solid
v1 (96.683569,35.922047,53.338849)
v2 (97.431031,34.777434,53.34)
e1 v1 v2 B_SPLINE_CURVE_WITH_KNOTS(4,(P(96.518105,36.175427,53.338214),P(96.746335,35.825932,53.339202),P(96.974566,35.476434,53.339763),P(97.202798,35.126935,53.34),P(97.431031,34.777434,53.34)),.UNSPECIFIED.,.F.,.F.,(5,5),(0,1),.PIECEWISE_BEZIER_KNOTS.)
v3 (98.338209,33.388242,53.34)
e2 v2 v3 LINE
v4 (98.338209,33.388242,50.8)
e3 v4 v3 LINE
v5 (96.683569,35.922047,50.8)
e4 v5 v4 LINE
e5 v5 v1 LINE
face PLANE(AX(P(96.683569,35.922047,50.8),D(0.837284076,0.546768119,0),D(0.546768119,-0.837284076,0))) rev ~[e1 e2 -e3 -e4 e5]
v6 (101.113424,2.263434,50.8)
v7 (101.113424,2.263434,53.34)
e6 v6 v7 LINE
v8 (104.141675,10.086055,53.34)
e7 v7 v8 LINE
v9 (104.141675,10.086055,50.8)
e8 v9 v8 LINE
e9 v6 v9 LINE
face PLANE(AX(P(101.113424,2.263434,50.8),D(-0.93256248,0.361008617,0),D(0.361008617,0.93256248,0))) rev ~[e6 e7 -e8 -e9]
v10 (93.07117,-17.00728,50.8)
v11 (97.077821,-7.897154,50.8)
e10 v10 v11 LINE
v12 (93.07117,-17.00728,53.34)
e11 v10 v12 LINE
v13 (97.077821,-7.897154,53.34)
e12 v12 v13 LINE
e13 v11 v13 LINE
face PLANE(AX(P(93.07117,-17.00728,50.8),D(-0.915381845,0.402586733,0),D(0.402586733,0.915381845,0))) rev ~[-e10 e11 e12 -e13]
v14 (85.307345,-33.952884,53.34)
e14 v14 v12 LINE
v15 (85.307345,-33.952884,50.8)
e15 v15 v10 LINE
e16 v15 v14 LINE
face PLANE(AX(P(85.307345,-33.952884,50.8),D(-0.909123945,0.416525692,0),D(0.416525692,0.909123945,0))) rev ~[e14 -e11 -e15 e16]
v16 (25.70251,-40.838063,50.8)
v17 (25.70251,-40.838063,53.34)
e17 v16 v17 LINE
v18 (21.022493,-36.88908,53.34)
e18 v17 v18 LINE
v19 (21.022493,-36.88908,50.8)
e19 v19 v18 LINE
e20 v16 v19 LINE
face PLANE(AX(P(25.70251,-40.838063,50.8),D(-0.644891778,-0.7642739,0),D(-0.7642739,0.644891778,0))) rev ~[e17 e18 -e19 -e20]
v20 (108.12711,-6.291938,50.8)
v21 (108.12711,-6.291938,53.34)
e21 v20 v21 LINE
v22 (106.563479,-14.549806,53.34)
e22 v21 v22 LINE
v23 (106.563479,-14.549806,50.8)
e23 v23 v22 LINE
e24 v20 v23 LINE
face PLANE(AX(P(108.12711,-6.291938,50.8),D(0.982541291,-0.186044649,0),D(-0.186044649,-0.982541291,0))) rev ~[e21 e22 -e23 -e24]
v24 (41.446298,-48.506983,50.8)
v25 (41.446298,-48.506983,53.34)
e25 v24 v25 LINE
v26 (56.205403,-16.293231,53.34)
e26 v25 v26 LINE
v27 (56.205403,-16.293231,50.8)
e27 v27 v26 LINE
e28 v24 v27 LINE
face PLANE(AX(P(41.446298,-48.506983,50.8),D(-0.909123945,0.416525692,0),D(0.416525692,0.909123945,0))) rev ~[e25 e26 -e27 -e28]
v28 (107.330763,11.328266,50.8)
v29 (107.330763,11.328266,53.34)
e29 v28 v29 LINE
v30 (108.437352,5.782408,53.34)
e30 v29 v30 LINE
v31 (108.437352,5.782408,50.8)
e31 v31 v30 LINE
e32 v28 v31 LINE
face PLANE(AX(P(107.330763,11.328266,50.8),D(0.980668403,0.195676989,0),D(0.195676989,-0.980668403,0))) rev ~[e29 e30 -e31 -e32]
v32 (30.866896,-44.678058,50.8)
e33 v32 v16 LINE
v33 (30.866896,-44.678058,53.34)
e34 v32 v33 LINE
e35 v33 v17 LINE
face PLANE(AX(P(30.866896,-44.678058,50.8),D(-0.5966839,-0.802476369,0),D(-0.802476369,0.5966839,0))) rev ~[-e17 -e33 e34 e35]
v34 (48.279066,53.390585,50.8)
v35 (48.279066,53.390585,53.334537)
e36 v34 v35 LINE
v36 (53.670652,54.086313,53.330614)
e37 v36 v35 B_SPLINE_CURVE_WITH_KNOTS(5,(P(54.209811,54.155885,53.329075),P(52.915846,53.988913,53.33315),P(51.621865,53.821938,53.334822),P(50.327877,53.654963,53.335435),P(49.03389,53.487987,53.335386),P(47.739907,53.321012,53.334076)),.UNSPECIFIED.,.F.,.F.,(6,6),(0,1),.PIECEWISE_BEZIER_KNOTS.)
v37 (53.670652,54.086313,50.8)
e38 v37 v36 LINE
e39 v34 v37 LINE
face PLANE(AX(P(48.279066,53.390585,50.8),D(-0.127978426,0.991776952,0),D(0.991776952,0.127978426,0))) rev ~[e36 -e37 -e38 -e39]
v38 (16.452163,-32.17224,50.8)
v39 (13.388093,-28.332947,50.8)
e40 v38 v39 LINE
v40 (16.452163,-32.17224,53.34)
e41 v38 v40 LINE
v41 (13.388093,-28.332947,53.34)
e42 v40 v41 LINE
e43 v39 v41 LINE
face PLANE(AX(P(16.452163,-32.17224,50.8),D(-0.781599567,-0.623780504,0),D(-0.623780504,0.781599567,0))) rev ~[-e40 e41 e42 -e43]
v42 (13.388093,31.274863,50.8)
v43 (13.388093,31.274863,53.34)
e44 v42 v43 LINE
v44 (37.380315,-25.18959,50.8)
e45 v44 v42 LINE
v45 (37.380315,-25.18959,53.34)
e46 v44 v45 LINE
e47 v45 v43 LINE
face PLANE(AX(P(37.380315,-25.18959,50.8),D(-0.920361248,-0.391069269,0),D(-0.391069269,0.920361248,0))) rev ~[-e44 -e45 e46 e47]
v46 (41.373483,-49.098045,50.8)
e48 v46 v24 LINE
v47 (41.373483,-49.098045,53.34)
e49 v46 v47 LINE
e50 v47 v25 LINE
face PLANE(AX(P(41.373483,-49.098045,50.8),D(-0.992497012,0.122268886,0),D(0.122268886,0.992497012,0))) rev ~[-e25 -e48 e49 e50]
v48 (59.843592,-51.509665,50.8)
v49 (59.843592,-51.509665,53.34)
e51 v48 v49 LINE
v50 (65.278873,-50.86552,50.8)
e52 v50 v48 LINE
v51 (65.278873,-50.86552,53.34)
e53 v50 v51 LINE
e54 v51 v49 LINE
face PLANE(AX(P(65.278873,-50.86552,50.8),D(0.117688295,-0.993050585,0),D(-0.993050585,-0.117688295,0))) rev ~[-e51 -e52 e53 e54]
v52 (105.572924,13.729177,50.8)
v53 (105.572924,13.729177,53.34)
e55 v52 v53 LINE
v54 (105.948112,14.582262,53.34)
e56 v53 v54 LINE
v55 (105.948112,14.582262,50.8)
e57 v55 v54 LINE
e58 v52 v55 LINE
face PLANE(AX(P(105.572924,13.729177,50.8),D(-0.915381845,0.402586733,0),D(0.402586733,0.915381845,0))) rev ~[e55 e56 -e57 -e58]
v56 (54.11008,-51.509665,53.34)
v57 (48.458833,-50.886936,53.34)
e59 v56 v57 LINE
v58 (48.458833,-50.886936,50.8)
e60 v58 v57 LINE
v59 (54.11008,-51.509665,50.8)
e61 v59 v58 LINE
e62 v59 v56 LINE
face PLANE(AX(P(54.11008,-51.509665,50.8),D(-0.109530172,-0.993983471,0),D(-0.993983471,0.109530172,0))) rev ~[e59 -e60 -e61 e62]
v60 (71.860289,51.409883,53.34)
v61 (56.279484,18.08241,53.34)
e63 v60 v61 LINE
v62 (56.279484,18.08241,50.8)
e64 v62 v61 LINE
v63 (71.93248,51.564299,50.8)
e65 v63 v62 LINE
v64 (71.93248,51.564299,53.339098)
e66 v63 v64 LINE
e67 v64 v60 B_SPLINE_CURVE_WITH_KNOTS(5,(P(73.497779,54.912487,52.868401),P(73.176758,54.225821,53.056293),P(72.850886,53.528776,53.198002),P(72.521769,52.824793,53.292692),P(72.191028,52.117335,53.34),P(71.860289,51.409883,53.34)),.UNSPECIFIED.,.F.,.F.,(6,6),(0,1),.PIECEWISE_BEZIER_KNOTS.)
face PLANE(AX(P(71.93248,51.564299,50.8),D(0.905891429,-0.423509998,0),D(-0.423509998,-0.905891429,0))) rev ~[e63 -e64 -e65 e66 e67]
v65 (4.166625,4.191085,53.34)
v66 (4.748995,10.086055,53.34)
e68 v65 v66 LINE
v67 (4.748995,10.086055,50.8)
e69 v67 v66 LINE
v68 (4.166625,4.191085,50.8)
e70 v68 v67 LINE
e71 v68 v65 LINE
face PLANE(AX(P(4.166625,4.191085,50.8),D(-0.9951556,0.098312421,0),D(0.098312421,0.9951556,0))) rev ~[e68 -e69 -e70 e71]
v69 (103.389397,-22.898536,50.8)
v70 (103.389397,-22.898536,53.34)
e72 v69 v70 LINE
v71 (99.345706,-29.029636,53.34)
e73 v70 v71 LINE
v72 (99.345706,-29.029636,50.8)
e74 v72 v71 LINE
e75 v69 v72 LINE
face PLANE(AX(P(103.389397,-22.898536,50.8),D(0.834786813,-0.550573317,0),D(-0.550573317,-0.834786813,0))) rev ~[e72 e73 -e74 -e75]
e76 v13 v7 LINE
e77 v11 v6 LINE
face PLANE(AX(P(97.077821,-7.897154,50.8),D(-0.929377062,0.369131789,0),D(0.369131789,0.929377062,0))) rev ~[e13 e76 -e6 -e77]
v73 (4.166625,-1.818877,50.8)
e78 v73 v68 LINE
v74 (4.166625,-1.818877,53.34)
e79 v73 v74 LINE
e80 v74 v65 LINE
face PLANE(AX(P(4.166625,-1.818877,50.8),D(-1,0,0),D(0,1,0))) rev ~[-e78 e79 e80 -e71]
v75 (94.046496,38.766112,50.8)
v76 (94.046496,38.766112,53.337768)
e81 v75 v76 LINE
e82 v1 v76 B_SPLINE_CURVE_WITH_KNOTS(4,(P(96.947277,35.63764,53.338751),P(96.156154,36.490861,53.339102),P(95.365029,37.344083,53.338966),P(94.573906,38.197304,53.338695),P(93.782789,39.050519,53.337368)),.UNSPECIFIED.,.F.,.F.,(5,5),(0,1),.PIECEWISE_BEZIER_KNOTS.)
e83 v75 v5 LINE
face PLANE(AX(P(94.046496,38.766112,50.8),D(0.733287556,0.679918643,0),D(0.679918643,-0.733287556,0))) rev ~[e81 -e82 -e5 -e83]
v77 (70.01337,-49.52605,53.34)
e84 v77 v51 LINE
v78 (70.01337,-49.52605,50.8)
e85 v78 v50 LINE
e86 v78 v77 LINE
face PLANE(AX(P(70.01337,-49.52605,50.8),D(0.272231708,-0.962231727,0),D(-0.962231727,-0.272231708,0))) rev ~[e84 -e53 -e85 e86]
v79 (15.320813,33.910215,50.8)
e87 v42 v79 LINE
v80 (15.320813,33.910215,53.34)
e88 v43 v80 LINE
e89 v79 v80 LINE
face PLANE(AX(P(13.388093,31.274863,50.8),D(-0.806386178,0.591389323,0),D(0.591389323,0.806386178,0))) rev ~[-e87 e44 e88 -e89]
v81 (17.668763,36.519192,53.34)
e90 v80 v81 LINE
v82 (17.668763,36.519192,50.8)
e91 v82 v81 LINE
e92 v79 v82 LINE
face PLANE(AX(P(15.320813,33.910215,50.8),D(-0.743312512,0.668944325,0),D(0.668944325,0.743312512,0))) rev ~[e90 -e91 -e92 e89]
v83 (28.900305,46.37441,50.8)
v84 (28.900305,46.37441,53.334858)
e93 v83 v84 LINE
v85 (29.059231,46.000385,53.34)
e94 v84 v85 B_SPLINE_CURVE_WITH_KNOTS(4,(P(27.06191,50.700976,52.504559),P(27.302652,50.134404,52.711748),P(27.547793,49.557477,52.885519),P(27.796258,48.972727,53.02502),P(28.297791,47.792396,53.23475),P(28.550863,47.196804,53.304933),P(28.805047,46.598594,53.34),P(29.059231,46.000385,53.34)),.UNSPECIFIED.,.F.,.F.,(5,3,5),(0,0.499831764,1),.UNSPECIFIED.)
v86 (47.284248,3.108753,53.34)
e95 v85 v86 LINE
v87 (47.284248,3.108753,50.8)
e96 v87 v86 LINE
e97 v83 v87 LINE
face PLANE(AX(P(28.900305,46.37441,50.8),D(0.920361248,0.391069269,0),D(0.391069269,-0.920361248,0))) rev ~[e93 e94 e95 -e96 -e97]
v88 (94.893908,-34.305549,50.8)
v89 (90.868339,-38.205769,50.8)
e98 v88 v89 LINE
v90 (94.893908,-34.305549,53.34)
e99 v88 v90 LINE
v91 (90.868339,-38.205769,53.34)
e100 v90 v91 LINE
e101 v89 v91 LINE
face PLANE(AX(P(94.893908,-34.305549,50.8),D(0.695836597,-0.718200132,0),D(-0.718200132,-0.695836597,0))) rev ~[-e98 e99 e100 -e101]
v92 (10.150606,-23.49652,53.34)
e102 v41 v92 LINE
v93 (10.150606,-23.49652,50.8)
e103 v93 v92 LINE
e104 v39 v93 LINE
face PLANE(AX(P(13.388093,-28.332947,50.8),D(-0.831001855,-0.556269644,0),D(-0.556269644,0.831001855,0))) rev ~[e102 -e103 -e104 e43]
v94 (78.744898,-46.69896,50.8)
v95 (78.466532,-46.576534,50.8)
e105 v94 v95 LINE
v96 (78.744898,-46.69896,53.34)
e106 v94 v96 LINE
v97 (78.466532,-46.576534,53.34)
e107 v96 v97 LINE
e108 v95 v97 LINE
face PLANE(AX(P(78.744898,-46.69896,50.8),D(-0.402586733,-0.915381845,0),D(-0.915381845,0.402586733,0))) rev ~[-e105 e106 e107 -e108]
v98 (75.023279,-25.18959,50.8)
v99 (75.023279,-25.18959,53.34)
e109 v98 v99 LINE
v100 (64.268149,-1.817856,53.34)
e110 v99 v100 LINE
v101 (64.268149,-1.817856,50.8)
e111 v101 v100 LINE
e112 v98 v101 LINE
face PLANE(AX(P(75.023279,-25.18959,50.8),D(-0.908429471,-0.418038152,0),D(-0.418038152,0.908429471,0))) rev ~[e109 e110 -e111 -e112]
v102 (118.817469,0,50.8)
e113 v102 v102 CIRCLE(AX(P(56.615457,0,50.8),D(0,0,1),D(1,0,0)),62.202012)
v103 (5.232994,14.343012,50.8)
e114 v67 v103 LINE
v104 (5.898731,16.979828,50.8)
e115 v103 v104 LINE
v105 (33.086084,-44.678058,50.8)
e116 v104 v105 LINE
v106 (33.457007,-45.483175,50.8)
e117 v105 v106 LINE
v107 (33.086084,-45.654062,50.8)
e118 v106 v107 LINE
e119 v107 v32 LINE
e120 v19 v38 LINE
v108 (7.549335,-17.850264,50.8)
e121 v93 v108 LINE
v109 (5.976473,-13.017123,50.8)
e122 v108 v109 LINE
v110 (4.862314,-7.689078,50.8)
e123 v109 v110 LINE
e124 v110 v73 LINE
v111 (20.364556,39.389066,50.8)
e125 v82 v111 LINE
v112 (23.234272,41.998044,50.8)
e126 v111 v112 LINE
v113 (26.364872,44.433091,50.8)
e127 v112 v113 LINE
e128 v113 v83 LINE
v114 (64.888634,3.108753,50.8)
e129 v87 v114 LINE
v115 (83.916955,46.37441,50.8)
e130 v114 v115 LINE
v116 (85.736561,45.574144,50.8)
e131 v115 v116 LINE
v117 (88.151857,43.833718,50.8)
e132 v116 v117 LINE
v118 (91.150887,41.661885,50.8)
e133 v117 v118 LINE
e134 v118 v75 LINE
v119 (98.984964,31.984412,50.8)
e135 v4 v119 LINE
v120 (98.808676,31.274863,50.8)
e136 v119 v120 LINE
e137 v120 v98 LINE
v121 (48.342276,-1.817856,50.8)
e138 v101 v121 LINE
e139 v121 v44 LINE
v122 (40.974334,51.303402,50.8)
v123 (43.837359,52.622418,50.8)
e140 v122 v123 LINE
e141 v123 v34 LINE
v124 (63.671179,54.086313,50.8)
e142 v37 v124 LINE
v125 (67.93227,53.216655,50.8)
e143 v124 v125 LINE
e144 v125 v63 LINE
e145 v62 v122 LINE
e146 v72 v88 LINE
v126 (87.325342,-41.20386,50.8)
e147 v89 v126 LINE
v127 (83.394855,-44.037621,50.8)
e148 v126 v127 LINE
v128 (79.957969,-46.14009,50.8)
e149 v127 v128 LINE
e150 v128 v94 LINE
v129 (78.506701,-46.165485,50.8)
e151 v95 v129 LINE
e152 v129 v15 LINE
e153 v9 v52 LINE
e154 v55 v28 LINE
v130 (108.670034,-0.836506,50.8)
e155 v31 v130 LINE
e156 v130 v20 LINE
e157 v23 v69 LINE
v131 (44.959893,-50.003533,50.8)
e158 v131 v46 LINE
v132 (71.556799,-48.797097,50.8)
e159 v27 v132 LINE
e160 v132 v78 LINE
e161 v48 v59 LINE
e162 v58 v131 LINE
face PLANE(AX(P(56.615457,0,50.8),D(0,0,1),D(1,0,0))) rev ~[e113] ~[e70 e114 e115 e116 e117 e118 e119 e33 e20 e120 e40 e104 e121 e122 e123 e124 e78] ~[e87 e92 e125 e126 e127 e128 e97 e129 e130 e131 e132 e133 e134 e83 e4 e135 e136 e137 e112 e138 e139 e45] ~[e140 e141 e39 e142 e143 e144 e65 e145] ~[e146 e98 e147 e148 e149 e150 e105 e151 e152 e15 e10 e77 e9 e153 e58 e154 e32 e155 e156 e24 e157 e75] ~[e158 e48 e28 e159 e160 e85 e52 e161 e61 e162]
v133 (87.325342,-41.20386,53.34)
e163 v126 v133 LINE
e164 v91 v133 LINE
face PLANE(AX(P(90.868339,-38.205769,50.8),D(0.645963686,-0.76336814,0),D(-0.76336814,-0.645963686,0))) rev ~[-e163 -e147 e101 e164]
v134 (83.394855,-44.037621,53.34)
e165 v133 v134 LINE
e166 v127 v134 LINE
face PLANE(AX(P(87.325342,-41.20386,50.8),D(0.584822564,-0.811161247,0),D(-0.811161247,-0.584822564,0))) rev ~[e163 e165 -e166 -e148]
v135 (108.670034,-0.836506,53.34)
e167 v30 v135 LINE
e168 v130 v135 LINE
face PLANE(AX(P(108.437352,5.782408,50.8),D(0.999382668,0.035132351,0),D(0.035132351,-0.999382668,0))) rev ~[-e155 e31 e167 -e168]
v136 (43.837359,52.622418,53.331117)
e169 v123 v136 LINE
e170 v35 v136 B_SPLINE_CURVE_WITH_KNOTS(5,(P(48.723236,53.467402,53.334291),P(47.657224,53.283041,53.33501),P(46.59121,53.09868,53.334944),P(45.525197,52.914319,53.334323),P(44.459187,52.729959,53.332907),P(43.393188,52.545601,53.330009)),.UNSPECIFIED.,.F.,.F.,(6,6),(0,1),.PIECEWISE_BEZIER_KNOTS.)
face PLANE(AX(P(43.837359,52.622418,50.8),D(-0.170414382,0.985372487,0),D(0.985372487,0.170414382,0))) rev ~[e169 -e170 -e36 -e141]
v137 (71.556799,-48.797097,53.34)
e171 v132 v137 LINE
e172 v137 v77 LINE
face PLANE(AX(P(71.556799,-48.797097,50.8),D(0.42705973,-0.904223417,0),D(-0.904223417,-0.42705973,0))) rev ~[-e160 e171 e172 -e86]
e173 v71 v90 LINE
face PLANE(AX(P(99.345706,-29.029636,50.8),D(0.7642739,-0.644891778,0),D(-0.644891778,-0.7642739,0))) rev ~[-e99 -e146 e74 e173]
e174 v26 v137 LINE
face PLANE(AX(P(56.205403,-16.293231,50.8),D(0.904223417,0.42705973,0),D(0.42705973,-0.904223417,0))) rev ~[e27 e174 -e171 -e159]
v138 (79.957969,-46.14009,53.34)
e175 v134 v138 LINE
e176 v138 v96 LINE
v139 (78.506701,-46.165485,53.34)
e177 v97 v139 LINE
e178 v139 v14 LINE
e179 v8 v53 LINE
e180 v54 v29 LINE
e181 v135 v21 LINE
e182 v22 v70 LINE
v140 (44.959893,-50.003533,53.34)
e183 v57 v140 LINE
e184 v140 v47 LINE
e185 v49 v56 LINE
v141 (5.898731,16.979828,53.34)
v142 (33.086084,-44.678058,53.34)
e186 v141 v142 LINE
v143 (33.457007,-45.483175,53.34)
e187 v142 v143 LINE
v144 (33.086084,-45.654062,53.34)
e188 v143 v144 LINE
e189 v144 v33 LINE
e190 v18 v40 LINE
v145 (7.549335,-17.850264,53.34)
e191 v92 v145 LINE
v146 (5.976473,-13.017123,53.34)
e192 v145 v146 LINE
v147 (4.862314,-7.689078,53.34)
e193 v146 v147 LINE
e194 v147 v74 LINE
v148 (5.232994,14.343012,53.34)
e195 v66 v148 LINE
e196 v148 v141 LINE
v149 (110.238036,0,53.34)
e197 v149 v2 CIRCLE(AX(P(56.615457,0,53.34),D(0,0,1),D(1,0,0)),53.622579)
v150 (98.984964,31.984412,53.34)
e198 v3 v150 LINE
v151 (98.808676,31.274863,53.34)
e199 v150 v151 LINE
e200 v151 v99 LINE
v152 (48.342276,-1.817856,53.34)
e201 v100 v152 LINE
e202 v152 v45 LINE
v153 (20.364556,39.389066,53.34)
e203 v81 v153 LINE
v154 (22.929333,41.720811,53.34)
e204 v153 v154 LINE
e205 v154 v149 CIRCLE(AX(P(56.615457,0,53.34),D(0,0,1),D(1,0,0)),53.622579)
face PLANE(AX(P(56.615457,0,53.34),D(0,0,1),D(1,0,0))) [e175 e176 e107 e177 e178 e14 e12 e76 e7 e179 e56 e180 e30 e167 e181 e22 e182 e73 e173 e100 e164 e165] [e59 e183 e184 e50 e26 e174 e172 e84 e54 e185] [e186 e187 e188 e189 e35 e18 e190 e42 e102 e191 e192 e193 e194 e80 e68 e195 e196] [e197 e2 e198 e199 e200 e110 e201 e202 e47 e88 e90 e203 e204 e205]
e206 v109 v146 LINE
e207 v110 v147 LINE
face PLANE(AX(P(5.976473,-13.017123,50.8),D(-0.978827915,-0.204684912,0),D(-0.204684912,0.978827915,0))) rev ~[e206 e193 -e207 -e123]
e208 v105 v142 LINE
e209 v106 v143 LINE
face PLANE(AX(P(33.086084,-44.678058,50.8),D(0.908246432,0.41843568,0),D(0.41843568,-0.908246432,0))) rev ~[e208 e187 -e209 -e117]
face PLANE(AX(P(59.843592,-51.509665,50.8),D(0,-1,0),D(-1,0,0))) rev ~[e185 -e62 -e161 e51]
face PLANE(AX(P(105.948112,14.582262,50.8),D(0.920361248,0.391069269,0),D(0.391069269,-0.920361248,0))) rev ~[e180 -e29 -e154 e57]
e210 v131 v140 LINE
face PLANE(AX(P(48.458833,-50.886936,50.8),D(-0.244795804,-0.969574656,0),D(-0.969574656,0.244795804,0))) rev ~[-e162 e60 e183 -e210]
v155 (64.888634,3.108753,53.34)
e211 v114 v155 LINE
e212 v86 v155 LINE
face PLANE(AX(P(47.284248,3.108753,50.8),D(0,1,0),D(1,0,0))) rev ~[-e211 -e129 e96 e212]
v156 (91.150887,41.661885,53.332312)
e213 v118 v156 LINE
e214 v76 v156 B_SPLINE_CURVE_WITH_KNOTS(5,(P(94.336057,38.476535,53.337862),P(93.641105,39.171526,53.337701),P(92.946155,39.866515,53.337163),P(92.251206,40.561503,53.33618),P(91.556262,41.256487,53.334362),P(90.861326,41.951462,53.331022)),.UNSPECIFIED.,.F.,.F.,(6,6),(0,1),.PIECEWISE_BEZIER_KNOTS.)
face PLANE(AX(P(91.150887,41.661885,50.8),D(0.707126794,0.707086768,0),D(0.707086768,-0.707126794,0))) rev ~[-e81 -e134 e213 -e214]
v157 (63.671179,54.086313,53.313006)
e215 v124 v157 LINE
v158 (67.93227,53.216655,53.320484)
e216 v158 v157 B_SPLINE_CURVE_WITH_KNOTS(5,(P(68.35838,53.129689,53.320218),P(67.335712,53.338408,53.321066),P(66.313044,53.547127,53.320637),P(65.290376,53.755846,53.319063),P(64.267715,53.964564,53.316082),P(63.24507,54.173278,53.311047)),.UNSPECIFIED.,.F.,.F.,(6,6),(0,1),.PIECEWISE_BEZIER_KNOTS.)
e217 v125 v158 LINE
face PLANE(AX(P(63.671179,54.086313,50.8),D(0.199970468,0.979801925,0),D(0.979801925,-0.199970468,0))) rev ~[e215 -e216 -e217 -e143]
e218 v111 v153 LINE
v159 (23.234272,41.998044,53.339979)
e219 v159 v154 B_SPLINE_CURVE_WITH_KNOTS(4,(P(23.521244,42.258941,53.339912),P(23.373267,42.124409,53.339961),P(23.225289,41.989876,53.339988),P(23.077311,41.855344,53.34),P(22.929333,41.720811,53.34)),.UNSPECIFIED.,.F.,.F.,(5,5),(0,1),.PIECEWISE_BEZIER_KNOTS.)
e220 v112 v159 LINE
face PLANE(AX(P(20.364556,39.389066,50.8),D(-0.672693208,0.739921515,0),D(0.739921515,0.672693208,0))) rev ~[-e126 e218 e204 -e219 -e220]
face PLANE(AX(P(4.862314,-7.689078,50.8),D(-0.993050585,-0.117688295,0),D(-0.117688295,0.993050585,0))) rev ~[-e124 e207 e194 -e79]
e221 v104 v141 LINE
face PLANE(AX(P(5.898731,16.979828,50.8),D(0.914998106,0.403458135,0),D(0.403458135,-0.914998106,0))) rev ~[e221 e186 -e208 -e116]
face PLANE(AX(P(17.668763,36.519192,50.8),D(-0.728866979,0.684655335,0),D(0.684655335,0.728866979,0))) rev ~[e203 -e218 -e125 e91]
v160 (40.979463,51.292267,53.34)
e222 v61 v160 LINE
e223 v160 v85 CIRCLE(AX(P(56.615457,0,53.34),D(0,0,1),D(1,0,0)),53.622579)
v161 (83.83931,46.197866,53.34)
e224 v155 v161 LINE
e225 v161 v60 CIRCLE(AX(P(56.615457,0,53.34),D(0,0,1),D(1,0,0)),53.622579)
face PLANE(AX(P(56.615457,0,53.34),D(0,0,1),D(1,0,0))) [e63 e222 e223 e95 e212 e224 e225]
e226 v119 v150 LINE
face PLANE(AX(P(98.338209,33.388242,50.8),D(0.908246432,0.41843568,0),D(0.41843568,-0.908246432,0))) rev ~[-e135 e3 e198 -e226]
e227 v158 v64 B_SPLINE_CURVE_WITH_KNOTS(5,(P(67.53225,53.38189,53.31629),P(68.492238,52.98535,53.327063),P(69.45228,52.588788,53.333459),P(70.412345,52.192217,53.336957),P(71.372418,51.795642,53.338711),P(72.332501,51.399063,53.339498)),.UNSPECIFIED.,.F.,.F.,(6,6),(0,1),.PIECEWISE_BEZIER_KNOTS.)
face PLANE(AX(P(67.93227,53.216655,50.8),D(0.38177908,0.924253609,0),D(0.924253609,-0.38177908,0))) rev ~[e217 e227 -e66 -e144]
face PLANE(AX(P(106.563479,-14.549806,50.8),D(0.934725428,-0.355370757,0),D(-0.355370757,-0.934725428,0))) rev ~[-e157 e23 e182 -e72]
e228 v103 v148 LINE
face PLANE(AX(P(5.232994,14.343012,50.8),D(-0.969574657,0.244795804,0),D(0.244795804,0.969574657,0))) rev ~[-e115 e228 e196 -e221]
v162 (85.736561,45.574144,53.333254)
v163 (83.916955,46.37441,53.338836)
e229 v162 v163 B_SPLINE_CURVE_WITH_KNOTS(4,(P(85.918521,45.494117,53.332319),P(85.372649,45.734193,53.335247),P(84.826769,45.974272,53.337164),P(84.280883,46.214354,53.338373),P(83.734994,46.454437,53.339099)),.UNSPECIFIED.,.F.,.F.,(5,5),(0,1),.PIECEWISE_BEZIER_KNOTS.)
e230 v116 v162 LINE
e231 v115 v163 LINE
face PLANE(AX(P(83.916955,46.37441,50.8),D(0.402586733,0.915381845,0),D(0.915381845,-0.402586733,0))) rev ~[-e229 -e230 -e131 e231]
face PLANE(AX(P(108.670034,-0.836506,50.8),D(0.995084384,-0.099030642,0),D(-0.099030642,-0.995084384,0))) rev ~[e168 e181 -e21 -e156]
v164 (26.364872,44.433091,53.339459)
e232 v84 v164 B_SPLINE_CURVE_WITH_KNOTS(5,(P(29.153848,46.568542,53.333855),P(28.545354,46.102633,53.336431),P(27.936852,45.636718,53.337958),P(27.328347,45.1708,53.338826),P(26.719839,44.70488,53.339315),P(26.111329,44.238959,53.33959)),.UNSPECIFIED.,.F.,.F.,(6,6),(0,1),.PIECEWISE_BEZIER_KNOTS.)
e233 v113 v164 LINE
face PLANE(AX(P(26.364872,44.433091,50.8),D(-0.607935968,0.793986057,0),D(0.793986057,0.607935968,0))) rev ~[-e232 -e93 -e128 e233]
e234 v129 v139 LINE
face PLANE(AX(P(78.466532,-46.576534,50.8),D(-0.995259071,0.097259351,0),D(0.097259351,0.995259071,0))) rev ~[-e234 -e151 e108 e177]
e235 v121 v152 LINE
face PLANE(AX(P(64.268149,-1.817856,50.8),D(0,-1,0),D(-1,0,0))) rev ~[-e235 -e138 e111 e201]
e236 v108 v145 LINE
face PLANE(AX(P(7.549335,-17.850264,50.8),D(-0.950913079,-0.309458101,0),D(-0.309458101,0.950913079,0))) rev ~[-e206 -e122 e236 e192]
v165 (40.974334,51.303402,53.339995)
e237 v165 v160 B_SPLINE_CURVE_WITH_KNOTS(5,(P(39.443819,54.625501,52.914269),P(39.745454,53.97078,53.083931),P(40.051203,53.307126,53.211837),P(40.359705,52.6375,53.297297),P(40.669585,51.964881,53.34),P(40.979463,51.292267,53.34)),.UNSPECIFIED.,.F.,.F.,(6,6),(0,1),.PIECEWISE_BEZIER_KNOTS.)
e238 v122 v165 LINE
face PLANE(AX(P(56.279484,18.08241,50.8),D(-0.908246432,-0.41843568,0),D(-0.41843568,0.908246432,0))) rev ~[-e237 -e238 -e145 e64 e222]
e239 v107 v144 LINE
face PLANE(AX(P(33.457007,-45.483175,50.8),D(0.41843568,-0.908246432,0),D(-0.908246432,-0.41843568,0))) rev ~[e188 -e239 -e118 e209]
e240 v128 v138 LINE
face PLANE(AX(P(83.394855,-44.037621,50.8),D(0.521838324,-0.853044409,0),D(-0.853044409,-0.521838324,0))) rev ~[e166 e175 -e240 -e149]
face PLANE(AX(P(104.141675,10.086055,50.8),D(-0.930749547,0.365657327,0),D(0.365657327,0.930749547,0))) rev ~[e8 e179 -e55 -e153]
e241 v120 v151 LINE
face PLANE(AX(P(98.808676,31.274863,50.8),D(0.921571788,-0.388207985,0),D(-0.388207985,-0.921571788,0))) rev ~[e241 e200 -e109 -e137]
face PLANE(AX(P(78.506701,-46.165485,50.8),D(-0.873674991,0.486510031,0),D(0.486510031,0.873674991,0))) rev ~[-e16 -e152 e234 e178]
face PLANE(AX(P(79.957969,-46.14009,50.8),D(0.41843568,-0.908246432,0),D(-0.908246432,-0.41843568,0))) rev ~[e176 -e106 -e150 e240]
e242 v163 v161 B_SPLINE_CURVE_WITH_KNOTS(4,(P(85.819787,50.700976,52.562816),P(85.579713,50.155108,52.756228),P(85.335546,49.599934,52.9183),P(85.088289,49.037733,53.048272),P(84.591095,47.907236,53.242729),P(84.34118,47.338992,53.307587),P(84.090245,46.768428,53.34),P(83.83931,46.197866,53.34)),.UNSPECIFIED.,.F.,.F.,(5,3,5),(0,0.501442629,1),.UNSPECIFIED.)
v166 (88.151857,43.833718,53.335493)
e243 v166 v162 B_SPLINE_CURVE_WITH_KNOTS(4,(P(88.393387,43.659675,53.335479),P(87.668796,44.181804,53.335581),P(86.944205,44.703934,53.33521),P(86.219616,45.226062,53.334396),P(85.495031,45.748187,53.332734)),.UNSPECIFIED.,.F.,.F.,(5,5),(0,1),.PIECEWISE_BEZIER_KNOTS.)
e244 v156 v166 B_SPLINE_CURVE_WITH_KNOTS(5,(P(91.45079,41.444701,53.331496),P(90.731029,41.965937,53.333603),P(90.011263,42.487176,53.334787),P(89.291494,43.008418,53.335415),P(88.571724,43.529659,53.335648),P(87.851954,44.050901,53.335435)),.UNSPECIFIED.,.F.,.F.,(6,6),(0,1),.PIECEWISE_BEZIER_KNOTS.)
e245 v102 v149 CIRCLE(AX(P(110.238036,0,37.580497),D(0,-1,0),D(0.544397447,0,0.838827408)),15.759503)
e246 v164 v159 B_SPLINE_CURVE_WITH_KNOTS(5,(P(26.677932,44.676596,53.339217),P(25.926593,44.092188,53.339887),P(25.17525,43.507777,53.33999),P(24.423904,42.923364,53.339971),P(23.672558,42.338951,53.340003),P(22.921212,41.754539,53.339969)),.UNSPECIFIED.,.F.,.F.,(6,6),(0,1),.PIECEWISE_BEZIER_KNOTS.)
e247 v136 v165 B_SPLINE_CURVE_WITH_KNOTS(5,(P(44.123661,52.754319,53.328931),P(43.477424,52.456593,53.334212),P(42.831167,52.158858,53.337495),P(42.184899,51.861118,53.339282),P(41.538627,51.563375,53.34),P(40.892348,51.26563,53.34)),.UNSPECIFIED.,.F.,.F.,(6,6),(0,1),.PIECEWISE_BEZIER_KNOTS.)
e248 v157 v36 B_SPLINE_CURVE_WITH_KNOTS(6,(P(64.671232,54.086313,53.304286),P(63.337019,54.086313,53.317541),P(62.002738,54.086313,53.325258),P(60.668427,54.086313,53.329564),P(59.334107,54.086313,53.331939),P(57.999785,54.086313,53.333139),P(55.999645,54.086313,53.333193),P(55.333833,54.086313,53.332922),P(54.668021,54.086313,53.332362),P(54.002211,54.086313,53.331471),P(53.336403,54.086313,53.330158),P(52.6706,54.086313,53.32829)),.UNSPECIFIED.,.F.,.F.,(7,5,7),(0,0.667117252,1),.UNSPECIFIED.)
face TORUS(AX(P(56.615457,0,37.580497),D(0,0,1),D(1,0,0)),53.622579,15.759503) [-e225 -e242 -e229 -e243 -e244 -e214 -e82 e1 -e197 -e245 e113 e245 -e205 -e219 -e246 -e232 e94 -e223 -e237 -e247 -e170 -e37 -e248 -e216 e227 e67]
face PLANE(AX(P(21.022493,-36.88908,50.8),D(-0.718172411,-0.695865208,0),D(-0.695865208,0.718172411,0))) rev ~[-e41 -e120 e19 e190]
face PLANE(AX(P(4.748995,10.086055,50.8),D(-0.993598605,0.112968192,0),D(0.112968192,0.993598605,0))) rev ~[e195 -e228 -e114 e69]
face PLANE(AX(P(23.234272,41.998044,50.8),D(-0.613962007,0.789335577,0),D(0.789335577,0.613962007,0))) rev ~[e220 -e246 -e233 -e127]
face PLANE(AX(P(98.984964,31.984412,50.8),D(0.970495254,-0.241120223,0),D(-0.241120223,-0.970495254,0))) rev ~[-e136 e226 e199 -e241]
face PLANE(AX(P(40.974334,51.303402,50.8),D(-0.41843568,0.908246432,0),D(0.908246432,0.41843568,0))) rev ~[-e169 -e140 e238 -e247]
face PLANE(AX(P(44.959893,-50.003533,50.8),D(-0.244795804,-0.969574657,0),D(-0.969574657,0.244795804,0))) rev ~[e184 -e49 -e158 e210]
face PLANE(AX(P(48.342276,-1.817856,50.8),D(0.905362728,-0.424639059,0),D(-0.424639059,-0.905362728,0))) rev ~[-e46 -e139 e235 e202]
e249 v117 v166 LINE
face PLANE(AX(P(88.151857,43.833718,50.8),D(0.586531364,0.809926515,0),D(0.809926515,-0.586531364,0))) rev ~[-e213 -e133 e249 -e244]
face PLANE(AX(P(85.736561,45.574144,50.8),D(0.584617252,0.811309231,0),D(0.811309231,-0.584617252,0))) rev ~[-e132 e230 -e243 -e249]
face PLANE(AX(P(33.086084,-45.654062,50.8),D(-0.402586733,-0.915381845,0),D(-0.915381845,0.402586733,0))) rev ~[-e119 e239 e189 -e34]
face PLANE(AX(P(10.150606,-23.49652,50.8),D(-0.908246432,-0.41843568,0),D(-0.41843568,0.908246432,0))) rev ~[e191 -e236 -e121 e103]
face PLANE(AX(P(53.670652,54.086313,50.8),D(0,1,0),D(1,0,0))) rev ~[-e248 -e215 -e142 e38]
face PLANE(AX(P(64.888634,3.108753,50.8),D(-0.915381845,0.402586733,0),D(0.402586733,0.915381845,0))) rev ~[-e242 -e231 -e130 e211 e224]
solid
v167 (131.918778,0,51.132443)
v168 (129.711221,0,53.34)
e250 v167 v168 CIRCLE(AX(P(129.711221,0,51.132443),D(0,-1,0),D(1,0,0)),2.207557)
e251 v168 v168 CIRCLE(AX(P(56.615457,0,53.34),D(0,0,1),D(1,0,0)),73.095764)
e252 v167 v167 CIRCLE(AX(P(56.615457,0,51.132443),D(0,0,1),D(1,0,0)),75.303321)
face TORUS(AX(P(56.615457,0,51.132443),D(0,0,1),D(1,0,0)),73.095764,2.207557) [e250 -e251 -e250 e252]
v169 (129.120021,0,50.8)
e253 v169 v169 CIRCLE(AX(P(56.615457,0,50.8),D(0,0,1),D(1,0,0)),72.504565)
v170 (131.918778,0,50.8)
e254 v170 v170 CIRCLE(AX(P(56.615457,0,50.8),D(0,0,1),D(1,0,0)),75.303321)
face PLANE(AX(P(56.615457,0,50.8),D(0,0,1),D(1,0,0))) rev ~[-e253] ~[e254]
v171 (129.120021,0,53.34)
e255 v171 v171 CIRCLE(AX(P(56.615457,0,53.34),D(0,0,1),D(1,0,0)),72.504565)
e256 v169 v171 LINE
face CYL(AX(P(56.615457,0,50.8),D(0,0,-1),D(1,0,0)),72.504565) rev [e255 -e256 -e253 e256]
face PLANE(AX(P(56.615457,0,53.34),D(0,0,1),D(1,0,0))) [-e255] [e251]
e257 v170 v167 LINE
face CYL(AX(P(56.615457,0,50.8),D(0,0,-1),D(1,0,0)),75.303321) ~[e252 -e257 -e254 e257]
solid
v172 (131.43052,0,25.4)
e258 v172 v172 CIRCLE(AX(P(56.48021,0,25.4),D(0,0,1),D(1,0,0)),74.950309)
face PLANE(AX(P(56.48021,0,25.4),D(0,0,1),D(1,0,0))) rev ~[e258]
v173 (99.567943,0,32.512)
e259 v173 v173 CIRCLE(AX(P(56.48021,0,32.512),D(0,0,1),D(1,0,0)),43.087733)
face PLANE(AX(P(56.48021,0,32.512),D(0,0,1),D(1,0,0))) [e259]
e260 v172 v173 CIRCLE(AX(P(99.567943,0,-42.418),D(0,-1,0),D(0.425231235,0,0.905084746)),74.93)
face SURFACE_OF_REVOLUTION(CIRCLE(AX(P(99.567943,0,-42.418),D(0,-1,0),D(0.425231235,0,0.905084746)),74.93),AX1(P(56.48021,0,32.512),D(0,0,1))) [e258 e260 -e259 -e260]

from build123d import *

# Parameters (mm, degrees)
F1_R     = 74.9503094081
F2_DEPTH = 7.112
F5_R     = 75.3033209634
F5_R_2   = 72.5045645267
F6_DEPTH = 2.54
F5_R_3   = 62.2020124847
F7_R     = 2.2075568814


# Not quite as in the source:
# - a fillet or chamfer that OpenCascade refuses, or shapes differently, is made with other operations: its cross-section is extruded or revolved along the edge and cut away or added


with BuildPart() as f2:
    # F1 (on offset) → F2 (new body)
    with BuildSketch(Plane.XY.offset(25.4)):
        with Locations((56.4802102745, 0)):
            Circle(F1_R)
    extrude(amount=F2_DEPTH)

    # F3: fillet of radius 74.93 on 1 edges, made by hand

    # F3_s1 → F3_t2 (revolve, cut)
    with BuildSketch(Plane.XZ):
        with BuildLine():
            ThreePointArc((131.4305196826, 25.4), (115.8912725817, 30.7123891689), (99.5679432645, 32.512))
            Line((99.5679432645, 32.512), (131.4305196826, 32.512))
            Line((131.4305196826, 32.512), (131.4305196826, 25.4))
        make_face()
    revolve(axis=Axis((56.4802102745, 0, 32.512), (0, 0, 1)), mode=Mode.SUBTRACT)


with BuildPart() as f6:
    # F5 (on offset) → F6 (new body)
    with BuildSketch(Plane.XY.offset(50.8)):
        with Locations((56.6154569387, 0)):
            Circle(F5_R)
        with Locations((56.6154569387, 0)):
            Circle(F5_R_2, mode=Mode.SUBTRACT)
    extrude(amount=F6_DEPTH)

    # F7
    f7_edges = [f6.edges().sort_by_distance(p)[0] for p in [
        (-18.687864, 0, 53.34),
    ]]
    fillet(f7_edges, radius=F7_R)


with BuildPart() as f6b:
    # F5 (on offset) → F6, piece 2 (new body)
    with BuildSketch(Plane.XY.offset(50.8)):
        with Locations((56.6154569387, 0)):
            Circle(F5_R_3)
        Polygon((5.2329944447, 14.3430121243), (5.898731295, 16.9798284769), (33.0860838294, -44.6780584753), (33.457006761, -45.4831748782), (33.0860838294, -45.6540617471), (30.8668957569, -44.6780584753), (25.7025100291, -40.8380627632), (21.0224930197, -36.8890799582), (16.4521634579, -32.1722403169), (13.3880926296, -28.332946822), (10.1506058127, -23.4965197742), (7.5493352948, -17.850264491), (5.9764734469, -13.0171226338), (4.8623140901, -7.6890783384), (4.1666254401, -1.8188767135), (4.1666254401, 4.1910852306), (4.7489954159, 10.0860549137), align=None, mode=Mode.SUBTRACT)
        Polygon((41.3734834984, -49.098044961), (41.4462983608, -48.5069826245), (56.2054026438, -16.2932312143), (71.5567991138, -48.7970970571), (70.0133701047, -49.5260500609), (65.2788728476, -50.8655197918), (59.8435918396, -51.5096651804), (54.1100800037, -51.5096651804), (48.4588332474, -50.8869364858), (44.9598932599, -50.0035327991), align=None, mode=Mode.SUBTRACT)
        Polygon((78.4665318757, -46.5765341646), (78.5067006946, -46.165484935), (85.3073447943, -33.952884376), (93.0711701512, -17.0072801411), (97.07782145, -7.8971541512), (101.1134237051, 2.2634342313), (104.1416749358, 10.0860549137), (105.5729240179, 13.7291774154), (105.9481124429, 14.5822623402), (107.3307628276, 11.3282663451), (108.4373518825, 5.7824077085), (108.6700335145, -0.8365057874), (108.1271097064, -6.29193848), (106.5634787083, -14.5498057827), (103.3893972635, -22.8985361755), (99.3457064033, -29.0296357125), (94.8939084716, -34.3055487947), (90.8683389425, -38.205768913), (87.3253419995, -41.2038601935), (83.3948552608, -44.0376214683), (79.9579694867, -46.1400896311), (78.7448983092, -46.6989602687), align=None, mode=Mode.SUBTRACT)
        Polygon((37.3803153634, -25.189589709), (13.3880926296, 31.2748625875), (15.3208132833, 33.910214901), (17.6687631756, 36.5191921592), (20.3645564616, 39.3890663981), (23.2342723757, 41.9980436563), (26.3648722321, 44.4330908358), (28.9003048092, 46.3744103909), (47.2842479364, 3.1087533801), (64.8886337876, 3.1087533801), (83.9169546962, 46.3744103909), (85.736560865, 45.5741440249), (88.1518572569, 43.8337177038), (91.1508873105, 41.6618846357), (94.0464958549, 38.7661121786), (96.6835692525, 35.9220467508), (98.3382090926, 33.3882421255), (98.9849639466, 31.9844115796), (98.8086760044, 31.2748625875), (75.023278594, -25.189589709), (64.2681494355, -1.8178562168), (48.3422763646, -1.8178562168), align=None, mode=Mode.SUBTRACT)
        Polygon((67.9322704673, 53.2166548073), (71.9324797392, 51.5642985702), (56.2794841826, 18.0824100971), (40.9743338823, 51.3034015894), (43.8373587113, 52.6224177702), (48.2790656388, 53.3905848861), (53.6706522107, 54.0863126516), (58.6274340749, 54.0863126516), (63.6711791158, 54.0863126516), align=None, mode=Mode.SUBTRACT)
    extrude(amount=F6_DEPTH)

    # F8: fillet of radius 15.7595032925 on 1 edges, made by hand

    # F8_s1 → F8_t2 (revolve, cut)
    with BuildSketch(Plane.XZ):
        with BuildLine():
            ThreePointArc((118.8174694234, 50.8), (114.711800609, 52.6916639306), (110.2380360665, 53.34))
            Line((110.2380360665, 53.34), (110.2380360665, 53.6551900658))
            Line((110.2380360665, 53.6551900658), (118.8174694234, 53.6551900658))
            Line((118.8174694234, 53.6551900658), (119.1326594893, 53.34))
            ThreePointArc((119.1326594893, 53.34), (119.1326594893, 52.07), (118.9890580906, 51.0643900658))
            Line((118.9890580906, 51.0643900658), (118.8174694234, 50.8))
        make_face()
    revolve(axis=Axis((56.6154569387, 0, 53.34), (0, 0, 1)), mode=Mode.SUBTRACT)


solid = Compound([f2.part, f6.part, f6b.part])
